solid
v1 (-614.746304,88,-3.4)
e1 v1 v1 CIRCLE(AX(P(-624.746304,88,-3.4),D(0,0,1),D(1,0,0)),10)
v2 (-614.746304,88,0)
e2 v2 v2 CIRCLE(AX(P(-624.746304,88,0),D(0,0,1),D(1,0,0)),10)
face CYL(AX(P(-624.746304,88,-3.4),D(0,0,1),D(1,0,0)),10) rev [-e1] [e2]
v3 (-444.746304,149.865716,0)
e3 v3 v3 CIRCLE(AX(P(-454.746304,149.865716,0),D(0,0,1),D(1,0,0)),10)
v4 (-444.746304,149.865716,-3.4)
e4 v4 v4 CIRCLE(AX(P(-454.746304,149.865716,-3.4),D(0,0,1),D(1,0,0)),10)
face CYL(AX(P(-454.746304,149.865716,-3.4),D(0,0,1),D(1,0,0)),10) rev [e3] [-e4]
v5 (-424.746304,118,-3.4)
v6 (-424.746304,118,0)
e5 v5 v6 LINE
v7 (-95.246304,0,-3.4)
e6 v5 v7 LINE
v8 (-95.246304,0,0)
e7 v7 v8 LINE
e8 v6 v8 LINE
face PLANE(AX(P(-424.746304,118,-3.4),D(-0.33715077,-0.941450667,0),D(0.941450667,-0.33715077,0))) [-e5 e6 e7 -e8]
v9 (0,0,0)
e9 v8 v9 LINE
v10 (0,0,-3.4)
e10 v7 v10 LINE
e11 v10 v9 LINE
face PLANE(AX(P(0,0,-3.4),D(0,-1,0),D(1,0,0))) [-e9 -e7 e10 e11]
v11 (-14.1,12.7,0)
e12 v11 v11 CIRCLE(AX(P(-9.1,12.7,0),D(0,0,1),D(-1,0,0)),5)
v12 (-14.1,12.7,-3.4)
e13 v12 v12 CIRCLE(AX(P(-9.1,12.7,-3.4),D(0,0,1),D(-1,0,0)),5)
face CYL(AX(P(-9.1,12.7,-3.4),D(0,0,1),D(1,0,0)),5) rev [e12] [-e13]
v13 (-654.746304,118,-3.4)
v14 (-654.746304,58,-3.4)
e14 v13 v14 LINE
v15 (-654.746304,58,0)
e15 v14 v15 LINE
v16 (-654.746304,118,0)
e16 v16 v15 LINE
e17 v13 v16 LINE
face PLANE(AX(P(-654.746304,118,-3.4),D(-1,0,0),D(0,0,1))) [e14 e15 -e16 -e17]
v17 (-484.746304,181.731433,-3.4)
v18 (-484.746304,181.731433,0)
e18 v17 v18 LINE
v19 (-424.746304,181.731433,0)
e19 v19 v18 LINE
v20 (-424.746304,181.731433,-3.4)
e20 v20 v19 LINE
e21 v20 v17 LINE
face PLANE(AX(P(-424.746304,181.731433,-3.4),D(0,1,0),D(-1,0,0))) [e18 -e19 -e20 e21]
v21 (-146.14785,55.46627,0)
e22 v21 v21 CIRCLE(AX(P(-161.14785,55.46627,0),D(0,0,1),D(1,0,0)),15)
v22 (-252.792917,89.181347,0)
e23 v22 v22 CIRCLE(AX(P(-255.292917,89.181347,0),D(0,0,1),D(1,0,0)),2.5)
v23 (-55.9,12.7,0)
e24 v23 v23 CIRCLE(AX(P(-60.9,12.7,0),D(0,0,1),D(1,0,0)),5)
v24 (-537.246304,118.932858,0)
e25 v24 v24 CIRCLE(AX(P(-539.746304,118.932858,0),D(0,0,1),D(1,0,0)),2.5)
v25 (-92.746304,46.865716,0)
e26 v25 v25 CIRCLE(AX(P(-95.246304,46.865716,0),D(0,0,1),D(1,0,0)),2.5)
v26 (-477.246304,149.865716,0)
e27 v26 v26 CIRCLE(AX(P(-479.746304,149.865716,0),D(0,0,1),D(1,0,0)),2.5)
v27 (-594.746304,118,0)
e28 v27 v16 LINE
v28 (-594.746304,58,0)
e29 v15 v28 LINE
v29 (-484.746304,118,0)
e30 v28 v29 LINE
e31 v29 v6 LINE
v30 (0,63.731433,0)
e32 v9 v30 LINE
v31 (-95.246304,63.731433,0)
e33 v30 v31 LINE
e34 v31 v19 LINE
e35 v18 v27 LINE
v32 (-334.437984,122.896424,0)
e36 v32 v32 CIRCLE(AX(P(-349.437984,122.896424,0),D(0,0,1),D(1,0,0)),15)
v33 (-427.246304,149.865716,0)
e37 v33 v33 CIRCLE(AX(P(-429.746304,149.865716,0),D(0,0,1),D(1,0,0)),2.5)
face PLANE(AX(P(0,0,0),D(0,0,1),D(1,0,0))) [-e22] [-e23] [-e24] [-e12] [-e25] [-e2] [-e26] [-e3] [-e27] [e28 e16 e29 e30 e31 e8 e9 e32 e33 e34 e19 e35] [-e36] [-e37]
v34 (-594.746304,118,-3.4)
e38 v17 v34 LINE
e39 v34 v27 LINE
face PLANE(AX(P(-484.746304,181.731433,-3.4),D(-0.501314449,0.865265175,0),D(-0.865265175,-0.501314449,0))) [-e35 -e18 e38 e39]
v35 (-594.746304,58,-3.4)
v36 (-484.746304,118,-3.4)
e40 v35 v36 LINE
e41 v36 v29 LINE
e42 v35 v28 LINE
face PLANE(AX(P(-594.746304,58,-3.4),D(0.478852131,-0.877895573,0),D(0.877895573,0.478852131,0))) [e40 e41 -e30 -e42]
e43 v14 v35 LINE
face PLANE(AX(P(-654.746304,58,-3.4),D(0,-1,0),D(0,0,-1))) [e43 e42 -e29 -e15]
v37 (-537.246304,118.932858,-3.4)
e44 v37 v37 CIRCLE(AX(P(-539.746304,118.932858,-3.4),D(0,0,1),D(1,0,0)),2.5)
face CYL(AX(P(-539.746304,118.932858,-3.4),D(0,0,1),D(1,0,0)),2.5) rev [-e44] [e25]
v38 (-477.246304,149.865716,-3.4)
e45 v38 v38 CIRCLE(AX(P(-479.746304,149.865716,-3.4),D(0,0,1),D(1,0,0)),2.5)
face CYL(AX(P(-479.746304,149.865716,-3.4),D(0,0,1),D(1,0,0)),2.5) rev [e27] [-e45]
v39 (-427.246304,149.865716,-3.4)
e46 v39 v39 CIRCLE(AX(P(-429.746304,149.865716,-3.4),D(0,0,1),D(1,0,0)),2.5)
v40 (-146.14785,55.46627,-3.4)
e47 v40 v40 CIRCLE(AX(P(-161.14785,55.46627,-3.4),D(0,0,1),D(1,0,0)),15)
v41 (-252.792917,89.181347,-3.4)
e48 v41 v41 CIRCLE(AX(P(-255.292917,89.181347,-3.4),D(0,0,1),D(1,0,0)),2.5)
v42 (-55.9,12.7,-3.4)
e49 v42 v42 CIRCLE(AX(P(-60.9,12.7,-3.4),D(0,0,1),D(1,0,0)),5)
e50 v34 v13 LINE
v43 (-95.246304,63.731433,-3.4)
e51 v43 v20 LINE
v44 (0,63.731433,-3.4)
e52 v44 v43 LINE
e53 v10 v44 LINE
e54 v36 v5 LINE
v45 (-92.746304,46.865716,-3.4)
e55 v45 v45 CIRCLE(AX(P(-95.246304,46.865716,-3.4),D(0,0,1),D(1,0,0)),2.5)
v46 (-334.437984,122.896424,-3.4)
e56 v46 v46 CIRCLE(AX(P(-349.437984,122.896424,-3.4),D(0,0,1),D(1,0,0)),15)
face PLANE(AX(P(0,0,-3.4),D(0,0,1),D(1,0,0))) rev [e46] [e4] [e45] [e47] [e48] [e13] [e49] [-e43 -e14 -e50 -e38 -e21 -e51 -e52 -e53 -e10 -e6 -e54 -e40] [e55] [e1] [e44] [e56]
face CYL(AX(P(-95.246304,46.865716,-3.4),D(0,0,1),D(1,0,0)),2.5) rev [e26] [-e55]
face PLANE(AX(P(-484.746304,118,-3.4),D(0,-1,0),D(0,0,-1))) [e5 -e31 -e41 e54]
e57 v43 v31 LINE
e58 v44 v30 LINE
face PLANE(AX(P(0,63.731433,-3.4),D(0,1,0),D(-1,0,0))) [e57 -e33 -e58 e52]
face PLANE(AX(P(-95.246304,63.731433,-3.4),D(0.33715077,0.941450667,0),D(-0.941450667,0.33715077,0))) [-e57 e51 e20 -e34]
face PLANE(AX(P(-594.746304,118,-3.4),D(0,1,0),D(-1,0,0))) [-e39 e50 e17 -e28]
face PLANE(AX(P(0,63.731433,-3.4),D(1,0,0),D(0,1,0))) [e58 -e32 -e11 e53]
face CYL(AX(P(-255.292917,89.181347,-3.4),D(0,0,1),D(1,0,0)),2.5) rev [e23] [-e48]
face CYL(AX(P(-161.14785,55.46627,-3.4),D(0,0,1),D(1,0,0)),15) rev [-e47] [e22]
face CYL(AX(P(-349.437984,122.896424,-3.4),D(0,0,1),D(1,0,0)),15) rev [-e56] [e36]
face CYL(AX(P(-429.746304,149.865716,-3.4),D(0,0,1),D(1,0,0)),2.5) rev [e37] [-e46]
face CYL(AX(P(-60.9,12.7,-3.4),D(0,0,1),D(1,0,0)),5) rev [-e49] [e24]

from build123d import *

# Parameters (mm, degrees)
SKETCH1_R          = 10
SKETCH1_R_2        = 2.5
SKETCH1_R_3        = 15
SKETCH1_R_4        = 5
BASE_FLANGE1_DEPTH = 3.4


# Sheet-metal steps are written as plain solids
with BuildPart() as part:
    # Sketch1 → Base-Flange1 (new body)
    with BuildSketch(Plane.XY):
        Polygon((0, 63.731432889), (0, 0), (-95.246303627, 0), (-424.746303627, 118), (-484.746303627, 118), (-594.746303627, 58), (-654.746303627, 58), (-654.746303627, 118), (-594.746303627, 118), (-484.746303627, 181.731432889), (-424.746303627, 181.731432889), (-95.246303627, 63.731432889), align=None)
        with Locations((-624.746303627, 88)):
            Circle(SKETCH1_R, mode=Mode.SUBTRACT)
        with Locations((-454.746303627, 149.865716445)):
            Circle(SKETCH1_R, mode=Mode.SUBTRACT)
        with Locations((-539.746303627, 118.932858222)):
            Circle(SKETCH1_R_2, mode=Mode.SUBTRACT)
        with Locations((-161.147850314, 55.466270342)):
            Circle(SKETCH1_R_3, mode=Mode.SUBTRACT)
        with Locations((-255.29291701, 89.181347338)):
            Circle(SKETCH1_R_2, mode=Mode.SUBTRACT)
        with Locations((-349.437983706, 122.896424333)):
            Circle(SKETCH1_R_3, mode=Mode.SUBTRACT)
        with Locations((-429.746303627, 149.865716445)):
            Circle(SKETCH1_R_2, mode=Mode.SUBTRACT)
        with Locations((-479.746303627, 149.865716445)):
            Circle(SKETCH1_R_2, mode=Mode.SUBTRACT)
        with Locations((-60.9, 12.7)):
            Circle(SKETCH1_R_4, mode=Mode.SUBTRACT)
        with Locations((-95.246303627, 46.865716445)):
            Circle(SKETCH1_R_2, mode=Mode.SUBTRACT)
        with Locations(Location((-9.1, 12.7, 0), (0, 0, 180))):
            Circle(SKETCH1_R_4, mode=Mode.SUBTRACT)
    extrude(amount=-BASE_FLANGE1_DEPTH)


solid = part.part
